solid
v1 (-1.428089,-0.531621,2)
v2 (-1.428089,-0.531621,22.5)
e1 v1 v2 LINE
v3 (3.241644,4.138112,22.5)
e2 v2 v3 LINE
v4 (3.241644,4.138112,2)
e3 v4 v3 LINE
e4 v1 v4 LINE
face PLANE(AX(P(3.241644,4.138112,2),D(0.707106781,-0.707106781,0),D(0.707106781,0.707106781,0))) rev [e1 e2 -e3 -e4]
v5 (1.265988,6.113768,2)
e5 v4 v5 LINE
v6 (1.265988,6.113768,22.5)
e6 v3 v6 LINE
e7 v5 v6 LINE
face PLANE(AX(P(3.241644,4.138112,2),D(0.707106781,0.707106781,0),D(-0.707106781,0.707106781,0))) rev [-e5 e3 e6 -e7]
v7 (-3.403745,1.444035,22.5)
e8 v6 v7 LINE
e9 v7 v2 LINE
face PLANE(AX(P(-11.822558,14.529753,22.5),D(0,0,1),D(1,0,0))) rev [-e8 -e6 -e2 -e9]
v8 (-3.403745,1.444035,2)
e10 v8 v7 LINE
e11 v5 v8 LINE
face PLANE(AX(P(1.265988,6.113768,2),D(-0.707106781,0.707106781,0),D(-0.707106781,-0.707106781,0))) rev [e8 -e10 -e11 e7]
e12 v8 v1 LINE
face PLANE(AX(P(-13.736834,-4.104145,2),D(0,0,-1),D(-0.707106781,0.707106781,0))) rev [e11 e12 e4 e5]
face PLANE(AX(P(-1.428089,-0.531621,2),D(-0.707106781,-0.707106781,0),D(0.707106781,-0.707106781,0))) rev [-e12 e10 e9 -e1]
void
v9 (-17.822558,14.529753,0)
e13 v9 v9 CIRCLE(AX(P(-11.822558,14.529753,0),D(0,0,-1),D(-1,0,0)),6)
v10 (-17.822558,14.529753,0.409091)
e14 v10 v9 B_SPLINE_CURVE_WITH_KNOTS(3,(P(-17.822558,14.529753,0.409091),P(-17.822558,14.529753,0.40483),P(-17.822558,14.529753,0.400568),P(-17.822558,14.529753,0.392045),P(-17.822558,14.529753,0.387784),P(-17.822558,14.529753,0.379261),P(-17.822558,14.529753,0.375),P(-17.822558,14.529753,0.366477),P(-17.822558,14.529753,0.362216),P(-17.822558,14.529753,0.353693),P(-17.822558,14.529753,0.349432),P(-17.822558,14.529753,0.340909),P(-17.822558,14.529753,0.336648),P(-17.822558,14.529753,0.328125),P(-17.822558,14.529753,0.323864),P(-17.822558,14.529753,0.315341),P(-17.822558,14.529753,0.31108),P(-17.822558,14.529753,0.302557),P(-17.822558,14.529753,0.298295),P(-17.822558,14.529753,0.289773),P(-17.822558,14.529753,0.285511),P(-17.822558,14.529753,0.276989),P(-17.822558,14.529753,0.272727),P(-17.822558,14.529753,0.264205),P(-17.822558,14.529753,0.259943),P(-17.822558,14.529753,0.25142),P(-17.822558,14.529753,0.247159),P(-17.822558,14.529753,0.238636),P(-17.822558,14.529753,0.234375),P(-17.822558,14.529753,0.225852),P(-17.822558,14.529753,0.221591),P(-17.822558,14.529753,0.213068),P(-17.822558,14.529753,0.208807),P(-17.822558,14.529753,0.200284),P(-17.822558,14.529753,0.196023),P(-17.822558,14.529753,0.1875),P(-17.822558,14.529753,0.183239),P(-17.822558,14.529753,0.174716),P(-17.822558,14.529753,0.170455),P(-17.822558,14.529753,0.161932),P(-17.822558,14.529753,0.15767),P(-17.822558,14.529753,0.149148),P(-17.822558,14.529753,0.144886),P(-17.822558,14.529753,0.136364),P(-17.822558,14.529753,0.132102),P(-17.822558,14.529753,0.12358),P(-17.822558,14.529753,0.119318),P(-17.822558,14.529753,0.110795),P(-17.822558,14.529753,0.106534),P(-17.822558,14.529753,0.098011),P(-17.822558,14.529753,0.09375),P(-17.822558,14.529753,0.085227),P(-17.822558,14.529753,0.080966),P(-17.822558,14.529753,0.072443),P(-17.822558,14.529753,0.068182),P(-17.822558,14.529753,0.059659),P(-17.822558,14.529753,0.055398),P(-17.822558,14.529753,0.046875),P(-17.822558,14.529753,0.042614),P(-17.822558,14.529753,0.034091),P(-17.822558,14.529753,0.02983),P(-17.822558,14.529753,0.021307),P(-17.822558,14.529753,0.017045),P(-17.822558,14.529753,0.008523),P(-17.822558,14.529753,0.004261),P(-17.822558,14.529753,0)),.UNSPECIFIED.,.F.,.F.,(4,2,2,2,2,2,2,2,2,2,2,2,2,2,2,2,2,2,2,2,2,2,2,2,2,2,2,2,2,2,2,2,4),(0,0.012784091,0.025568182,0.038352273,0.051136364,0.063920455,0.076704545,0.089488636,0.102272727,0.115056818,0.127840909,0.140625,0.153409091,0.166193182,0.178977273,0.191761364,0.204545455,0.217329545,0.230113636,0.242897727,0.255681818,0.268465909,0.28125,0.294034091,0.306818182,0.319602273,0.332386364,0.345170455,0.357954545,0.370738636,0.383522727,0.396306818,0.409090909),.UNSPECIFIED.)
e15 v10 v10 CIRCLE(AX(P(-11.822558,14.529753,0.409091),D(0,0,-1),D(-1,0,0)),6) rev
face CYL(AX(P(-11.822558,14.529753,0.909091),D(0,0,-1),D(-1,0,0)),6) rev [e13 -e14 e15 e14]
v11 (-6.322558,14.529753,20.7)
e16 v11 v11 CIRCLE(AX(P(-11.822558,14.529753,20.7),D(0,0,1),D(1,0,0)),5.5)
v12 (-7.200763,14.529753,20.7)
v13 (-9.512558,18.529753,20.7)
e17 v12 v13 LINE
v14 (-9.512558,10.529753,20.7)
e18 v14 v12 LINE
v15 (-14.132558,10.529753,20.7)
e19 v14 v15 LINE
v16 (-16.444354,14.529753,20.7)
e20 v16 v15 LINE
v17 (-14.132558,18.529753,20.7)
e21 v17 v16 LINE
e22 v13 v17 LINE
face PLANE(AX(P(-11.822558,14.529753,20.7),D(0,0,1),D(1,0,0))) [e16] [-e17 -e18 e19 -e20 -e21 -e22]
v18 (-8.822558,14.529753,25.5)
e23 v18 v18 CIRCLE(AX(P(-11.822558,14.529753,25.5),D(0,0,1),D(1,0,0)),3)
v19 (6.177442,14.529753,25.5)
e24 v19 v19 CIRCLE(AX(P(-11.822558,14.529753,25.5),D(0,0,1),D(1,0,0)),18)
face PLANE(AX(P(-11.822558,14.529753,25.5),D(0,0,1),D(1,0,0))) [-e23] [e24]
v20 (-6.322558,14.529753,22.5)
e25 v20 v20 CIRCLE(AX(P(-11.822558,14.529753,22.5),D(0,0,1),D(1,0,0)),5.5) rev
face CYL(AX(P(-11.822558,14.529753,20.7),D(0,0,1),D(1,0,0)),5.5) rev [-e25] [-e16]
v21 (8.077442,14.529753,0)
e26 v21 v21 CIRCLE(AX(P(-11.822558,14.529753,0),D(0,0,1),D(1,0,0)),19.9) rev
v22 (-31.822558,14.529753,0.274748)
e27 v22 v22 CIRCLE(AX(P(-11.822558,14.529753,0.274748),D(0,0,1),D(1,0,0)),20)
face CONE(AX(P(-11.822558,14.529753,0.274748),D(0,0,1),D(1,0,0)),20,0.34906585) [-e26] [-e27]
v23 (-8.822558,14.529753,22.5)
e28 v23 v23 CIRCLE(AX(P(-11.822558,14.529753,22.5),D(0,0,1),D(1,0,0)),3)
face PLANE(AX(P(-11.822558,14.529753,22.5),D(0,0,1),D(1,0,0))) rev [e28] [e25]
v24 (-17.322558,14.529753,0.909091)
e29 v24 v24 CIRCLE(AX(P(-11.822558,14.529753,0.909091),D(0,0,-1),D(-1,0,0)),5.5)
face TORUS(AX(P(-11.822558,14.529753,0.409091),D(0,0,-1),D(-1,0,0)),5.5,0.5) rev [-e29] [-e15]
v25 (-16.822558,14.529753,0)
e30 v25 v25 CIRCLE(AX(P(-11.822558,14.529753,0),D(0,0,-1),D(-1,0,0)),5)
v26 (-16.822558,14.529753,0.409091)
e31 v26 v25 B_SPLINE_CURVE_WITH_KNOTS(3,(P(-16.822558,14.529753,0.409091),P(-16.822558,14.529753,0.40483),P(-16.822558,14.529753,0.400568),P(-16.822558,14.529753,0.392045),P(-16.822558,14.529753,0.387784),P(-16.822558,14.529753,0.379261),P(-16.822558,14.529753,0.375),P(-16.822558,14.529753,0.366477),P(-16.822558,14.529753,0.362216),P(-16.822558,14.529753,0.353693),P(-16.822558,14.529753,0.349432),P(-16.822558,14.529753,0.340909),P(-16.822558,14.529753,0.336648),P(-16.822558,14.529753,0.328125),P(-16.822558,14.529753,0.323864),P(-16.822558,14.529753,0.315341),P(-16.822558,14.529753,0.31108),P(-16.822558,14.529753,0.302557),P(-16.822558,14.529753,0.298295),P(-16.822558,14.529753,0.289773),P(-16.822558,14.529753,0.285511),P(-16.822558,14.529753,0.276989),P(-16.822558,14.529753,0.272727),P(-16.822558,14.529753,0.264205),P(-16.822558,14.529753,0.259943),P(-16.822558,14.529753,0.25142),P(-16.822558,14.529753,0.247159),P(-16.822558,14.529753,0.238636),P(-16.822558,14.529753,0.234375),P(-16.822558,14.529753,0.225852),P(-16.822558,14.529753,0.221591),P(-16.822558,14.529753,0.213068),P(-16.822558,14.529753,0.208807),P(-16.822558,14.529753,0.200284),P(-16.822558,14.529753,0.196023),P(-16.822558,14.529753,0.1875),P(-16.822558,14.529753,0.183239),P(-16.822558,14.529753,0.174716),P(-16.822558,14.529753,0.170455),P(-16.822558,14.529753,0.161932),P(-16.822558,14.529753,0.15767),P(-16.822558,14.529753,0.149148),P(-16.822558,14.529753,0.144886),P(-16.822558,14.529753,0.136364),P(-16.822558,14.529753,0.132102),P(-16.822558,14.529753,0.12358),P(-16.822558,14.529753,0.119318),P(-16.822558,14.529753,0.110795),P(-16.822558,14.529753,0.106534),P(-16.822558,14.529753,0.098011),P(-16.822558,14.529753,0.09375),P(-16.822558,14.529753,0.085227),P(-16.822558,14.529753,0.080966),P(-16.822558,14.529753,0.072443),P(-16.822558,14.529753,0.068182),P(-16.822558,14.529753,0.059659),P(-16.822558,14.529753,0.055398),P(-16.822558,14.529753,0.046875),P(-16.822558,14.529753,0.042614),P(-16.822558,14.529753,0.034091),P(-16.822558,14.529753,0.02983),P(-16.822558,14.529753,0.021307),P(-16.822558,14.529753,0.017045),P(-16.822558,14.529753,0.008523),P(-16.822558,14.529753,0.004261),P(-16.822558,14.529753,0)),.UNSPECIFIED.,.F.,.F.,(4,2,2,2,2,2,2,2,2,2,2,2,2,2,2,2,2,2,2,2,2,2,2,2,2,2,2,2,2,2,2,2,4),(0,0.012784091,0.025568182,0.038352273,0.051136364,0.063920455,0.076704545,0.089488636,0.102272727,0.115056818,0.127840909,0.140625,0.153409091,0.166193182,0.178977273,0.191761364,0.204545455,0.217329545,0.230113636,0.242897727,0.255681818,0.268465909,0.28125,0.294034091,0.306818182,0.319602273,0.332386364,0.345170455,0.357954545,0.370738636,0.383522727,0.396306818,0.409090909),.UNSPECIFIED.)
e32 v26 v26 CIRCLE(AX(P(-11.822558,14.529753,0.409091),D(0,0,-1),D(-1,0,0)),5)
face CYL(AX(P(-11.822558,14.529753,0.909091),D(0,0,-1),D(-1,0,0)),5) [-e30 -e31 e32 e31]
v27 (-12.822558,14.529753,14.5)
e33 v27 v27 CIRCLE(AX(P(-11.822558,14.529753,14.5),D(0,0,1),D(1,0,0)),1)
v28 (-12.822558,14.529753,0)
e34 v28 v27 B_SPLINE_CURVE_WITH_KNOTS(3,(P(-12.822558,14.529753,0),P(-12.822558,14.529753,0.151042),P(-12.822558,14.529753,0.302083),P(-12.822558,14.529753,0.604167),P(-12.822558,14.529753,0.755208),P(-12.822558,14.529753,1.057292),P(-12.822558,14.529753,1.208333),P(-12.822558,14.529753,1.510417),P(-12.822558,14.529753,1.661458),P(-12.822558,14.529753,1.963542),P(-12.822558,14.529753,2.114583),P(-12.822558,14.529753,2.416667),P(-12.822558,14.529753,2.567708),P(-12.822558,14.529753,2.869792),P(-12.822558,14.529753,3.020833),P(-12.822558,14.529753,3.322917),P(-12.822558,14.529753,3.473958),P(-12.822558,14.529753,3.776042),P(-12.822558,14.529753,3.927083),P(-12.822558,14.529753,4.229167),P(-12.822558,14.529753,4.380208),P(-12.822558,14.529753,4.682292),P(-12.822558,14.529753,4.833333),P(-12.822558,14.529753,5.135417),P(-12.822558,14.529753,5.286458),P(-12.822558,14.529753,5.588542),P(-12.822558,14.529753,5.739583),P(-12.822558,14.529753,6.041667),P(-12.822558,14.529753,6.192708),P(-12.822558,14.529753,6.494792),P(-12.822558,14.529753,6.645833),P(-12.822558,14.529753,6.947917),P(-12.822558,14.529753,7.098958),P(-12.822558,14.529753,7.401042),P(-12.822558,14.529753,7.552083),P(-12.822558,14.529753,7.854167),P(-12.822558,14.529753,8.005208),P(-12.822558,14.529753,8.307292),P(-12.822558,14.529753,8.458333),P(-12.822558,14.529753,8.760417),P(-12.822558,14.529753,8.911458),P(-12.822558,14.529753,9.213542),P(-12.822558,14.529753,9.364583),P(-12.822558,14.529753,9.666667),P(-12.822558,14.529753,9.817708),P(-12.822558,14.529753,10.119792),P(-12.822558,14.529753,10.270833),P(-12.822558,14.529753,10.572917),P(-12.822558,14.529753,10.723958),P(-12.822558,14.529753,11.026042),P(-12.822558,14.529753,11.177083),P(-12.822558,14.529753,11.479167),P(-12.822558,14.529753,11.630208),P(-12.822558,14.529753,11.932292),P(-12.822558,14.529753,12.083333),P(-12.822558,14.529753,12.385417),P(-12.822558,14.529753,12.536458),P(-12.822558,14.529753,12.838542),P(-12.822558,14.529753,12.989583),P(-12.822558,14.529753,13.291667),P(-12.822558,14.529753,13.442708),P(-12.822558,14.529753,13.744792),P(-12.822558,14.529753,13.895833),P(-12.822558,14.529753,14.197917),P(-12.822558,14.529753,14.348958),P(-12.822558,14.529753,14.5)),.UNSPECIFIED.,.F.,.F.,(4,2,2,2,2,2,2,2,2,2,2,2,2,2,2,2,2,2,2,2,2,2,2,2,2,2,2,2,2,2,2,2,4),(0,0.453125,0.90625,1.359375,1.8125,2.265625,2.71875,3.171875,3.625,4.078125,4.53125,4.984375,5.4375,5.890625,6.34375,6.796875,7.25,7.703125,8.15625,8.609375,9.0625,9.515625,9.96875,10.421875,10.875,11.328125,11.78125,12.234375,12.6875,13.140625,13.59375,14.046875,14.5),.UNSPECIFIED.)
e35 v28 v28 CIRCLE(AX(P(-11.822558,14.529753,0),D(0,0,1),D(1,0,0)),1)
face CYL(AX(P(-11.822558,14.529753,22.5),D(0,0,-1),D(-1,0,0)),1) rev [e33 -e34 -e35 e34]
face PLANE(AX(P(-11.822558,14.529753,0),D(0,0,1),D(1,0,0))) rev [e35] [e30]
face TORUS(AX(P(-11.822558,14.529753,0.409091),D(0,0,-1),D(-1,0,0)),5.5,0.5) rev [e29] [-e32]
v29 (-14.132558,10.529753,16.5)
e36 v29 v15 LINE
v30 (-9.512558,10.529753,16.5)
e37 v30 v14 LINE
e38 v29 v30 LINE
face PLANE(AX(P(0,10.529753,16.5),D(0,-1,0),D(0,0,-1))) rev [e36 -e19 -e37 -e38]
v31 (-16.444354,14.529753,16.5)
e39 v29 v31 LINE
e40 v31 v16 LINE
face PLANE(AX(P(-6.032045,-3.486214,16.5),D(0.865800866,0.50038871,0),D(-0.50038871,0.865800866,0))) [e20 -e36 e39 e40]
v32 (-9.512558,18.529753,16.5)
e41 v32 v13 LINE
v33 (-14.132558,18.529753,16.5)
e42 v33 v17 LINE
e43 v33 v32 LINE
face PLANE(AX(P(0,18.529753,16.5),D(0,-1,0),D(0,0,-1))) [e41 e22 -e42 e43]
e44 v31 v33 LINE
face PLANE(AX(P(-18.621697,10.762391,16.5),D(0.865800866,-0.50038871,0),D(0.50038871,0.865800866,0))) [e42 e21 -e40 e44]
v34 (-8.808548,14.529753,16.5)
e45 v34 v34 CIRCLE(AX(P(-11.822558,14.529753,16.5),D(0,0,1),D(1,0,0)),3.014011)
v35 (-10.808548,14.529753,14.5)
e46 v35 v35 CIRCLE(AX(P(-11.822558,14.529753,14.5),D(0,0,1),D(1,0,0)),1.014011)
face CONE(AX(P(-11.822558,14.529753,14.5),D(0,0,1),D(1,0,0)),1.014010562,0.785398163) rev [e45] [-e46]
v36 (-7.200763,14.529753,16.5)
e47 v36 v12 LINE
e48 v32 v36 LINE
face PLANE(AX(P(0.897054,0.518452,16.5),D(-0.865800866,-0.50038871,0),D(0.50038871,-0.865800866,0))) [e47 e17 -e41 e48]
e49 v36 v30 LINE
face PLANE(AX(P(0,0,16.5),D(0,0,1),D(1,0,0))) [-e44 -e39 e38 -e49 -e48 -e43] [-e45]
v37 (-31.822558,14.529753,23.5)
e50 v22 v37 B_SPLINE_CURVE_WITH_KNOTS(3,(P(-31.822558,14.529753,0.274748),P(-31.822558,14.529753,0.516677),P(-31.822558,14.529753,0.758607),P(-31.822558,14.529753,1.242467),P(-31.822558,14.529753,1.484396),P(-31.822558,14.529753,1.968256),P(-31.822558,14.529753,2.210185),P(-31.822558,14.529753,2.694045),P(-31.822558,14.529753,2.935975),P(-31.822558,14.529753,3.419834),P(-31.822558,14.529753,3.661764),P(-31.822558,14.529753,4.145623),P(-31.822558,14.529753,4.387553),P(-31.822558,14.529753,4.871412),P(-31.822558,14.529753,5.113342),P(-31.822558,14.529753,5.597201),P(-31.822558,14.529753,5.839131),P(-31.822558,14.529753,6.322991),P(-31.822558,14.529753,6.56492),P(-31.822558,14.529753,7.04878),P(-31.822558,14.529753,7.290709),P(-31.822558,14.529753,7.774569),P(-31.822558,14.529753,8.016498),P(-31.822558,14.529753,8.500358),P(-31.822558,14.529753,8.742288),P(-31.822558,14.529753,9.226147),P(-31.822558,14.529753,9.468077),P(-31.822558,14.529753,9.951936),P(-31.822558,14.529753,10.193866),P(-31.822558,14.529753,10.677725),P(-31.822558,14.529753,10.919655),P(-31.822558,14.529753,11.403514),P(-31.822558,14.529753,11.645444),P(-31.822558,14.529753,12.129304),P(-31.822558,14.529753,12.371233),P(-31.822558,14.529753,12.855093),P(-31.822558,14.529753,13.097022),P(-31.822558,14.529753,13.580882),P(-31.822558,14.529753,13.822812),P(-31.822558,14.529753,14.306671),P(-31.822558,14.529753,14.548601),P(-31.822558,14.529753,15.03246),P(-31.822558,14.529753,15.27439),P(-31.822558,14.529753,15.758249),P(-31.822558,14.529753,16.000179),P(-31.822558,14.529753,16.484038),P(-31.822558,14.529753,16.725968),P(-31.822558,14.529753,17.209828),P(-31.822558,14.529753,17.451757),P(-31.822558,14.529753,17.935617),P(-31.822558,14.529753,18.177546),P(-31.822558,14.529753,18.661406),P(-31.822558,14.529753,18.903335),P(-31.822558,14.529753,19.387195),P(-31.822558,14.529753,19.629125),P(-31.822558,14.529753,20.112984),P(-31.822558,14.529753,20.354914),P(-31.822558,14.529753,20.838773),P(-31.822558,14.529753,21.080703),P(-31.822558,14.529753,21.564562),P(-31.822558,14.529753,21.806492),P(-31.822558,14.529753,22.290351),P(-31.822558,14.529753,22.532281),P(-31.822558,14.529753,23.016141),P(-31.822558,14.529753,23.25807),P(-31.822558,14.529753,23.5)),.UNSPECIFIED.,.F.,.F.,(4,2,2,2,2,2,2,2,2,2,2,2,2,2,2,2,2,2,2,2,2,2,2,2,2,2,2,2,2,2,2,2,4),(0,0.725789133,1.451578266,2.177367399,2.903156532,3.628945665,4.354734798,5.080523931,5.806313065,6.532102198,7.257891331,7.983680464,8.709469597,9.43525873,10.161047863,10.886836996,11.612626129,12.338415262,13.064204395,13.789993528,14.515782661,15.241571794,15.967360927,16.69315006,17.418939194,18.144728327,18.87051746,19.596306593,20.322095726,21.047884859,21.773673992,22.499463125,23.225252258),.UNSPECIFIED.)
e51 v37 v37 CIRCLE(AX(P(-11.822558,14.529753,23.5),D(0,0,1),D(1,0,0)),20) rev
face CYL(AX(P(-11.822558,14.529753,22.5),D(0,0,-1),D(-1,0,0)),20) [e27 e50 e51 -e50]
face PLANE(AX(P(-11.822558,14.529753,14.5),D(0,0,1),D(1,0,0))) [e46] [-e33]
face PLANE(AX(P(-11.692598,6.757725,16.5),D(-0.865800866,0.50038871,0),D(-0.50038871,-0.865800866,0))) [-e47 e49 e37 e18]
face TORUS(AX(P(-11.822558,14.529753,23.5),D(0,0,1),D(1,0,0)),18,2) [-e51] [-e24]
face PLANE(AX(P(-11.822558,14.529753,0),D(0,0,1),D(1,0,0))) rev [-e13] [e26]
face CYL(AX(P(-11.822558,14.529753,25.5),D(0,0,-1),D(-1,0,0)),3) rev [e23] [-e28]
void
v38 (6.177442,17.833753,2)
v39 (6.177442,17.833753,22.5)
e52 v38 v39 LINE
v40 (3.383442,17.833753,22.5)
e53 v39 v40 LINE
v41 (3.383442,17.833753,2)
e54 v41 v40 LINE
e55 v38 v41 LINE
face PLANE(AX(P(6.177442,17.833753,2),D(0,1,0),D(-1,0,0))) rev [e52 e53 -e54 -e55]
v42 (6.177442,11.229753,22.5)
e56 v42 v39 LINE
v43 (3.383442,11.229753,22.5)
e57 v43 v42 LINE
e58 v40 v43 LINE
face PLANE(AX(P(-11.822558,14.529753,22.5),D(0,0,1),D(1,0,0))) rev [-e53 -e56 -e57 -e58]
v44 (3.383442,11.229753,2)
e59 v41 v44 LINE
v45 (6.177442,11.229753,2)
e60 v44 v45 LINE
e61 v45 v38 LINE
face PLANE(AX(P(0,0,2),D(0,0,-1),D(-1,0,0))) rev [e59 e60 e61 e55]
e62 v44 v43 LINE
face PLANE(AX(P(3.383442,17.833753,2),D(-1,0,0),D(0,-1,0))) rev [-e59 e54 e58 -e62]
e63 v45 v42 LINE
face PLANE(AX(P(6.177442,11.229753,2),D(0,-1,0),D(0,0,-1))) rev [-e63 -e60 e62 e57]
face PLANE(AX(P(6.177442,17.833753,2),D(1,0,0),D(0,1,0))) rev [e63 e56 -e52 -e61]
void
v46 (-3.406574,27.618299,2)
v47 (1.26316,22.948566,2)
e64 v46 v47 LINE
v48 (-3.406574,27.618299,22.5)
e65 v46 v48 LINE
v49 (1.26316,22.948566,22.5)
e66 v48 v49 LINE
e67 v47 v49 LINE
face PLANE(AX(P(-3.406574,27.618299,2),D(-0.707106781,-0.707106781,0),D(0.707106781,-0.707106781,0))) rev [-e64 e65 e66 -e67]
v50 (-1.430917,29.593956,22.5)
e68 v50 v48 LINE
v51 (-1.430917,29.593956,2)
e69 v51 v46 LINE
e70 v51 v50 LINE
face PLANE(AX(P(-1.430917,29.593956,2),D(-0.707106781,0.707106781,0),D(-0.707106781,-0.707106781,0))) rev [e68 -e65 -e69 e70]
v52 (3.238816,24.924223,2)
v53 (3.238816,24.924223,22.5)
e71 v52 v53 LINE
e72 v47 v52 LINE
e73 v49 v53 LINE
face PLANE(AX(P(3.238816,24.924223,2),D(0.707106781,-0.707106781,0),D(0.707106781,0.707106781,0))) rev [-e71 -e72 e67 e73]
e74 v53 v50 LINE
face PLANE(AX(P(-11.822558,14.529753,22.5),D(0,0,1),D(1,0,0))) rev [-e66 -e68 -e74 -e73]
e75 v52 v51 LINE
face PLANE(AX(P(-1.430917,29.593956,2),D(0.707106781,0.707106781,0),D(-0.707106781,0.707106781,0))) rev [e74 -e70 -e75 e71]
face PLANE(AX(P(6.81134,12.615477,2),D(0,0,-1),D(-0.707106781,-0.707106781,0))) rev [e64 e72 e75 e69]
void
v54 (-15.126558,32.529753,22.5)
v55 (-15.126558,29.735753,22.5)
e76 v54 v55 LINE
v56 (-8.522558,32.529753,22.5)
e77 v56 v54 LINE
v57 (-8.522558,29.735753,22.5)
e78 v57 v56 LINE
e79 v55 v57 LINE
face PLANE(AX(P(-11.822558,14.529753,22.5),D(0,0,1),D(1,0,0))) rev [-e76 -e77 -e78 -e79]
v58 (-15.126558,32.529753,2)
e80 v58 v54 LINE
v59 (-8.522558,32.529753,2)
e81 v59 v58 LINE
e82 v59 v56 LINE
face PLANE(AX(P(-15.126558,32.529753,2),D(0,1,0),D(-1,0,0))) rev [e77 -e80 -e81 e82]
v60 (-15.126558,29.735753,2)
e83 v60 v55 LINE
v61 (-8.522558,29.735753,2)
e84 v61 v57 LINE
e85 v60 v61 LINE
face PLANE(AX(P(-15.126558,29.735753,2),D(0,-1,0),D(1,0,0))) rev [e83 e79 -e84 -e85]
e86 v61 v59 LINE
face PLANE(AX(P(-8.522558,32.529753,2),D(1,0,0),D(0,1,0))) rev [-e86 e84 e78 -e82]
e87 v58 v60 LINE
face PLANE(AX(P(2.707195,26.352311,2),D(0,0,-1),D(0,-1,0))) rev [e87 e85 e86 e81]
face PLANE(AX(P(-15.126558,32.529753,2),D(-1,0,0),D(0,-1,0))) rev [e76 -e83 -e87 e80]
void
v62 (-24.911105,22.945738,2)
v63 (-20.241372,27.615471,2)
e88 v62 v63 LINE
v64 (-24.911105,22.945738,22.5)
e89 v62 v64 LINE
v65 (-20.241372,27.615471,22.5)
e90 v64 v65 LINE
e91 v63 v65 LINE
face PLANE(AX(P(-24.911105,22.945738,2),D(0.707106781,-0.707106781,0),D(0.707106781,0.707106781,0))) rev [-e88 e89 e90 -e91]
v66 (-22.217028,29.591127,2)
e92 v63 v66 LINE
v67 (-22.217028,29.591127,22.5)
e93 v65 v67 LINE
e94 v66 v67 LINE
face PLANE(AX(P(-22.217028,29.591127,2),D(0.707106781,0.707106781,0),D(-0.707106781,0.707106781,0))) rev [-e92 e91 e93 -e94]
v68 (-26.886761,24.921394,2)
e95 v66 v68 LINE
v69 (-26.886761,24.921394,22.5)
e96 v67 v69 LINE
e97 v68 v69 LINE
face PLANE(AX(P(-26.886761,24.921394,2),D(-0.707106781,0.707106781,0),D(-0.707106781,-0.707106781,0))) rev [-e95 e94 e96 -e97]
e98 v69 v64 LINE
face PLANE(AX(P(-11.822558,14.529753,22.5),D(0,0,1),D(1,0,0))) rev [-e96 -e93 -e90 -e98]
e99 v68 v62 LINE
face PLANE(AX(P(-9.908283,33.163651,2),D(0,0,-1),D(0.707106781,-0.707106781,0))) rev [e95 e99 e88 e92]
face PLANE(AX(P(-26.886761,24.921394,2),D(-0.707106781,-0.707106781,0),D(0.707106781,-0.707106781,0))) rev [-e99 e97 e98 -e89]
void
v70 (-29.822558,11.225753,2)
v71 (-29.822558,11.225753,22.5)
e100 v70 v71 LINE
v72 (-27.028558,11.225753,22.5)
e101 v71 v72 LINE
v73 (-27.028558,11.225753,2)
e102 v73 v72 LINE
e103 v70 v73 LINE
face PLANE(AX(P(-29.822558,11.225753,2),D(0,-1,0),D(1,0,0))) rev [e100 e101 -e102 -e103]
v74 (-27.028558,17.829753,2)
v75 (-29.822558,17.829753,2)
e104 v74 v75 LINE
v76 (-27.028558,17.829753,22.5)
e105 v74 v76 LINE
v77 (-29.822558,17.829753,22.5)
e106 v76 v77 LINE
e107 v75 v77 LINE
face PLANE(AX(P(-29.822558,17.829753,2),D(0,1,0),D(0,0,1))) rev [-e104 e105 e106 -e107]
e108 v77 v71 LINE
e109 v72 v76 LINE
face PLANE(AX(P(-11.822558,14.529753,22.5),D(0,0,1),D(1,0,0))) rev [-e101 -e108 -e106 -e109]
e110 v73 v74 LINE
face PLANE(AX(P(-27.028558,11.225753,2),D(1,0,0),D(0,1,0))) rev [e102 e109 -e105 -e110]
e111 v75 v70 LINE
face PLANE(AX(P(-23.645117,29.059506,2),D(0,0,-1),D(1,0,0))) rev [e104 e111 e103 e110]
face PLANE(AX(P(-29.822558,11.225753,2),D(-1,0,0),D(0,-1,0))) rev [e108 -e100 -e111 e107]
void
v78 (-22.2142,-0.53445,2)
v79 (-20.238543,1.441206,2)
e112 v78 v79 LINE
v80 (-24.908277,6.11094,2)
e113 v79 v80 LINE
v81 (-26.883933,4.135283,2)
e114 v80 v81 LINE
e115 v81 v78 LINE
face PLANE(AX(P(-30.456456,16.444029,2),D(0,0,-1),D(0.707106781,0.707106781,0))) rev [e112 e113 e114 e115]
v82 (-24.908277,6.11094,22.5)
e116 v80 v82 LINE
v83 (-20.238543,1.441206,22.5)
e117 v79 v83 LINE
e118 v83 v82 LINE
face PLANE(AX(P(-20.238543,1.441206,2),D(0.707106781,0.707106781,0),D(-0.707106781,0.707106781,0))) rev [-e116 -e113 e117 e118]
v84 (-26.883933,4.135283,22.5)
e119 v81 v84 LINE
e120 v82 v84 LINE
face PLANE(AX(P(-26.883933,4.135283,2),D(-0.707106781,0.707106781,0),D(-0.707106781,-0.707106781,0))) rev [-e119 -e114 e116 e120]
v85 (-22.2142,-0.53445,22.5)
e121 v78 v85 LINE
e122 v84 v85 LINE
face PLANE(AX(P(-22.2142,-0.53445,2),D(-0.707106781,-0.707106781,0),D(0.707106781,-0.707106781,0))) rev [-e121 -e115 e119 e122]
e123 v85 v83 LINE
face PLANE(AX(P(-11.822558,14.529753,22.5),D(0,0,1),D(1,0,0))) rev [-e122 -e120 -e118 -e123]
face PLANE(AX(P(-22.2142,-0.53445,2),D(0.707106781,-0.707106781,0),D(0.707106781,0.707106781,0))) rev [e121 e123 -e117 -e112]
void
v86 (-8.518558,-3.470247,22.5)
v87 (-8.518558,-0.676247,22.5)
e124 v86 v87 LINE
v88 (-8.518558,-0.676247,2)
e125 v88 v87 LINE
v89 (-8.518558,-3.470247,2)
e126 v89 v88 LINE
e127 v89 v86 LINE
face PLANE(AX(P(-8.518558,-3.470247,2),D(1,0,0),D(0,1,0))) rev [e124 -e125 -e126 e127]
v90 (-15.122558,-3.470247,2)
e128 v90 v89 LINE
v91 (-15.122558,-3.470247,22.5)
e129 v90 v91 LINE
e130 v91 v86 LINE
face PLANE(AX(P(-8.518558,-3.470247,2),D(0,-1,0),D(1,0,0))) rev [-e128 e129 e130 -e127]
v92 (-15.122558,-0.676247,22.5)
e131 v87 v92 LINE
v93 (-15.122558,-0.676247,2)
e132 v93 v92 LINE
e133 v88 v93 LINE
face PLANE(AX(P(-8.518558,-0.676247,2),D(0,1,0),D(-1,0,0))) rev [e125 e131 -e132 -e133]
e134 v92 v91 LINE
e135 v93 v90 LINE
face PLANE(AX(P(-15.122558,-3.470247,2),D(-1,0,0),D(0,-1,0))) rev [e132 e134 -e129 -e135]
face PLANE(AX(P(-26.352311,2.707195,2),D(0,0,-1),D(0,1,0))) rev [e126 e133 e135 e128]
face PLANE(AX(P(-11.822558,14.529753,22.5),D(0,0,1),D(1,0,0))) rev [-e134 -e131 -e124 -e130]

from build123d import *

# Parameters (mm, degrees)
SKETCH1_R                       = 20
SKETCH1_R_2                     = 1
BOSS_EXTRUDE1_DEPTH             = 22.5
TAP_DRILL_FOR_M5X0_8_TAP1_D     = 4.2
TAP_DRILL_FOR_M5X0_8_TAP1_DEPTH = 5
TAP_DRILL_FOR_M5X0_8_TAP1_TIP   = 1.2618073
SKETCH4_W                       = 2.794
SKETCH4_H                       = 6.604
CUT_EXTRUDE1_DEPTH              = 20.5
CIRPATTERN1_COUNT               = 8
CUT_EXTRUDE3_START              = -6
SKETCH6_W                       = 4.62
SKETCH6_H                       = 8
SKETCH6_R                       = 2.1
CUT_EXTRUDE3_DEPTH              = 6
SKETCH7_R                       = 5.5
CUT_EXTRUDE4_DEPTH              = 1.8
SKETCH9_R                       = 3.014010562
CUT_EXTRUDE5_DEPTH              = 2
CHAMFER1_SIZE                   = 2
SKETCH8_R                       = 20
SKETCH8_R_2                     = 3
BOSS_EXTRUDE2_DEPTH             = 3
SKETCH5_R                       = 6
SKETCH5_R_2                     = 5
CUT_EXTRUDE2_DEPTH              = 0.909090909
FILLET3_R                       = 0.5
FILLET4_R                       = 2
CHAMFER2_SIZE                   = 0.1
CHAMFER2_SIZE2                  = 0.274747742


with BuildPart() as part:
    # Sketch1 → Boss-Extrude1 (new body)
    with BuildSketch(Plane.XY):
        with Locations(Location((-11.822558412, 14.529752947, 0), (0, 0, 180))):
            Circle(SKETCH1_R)
        with Locations(Location((-11.822558412, 14.529752947, 0), (0, 0, 180))):
            Circle(SKETCH1_R_2, mode=Mode.SUBTRACT)
    extrude(amount=BOSS_EXTRUDE1_DEPTH)

    # Tap Drill for M5x0.8 Tap1
    with Locations(Plane.XY.offset(22.5)):
        with Locations((-11.822558412, 14.529752947)):
            Hole(TAP_DRILL_FOR_M5X0_8_TAP1_D / 2, depth=TAP_DRILL_FOR_M5X0_8_TAP1_DEPTH)
            with Locations((0, 0, -(TAP_DRILL_FOR_M5X0_8_TAP1_DEPTH + TAP_DRILL_FOR_M5X0_8_TAP1_TIP / 2))):  # 118° drill point
                Cone(0, TAP_DRILL_FOR_M5X0_8_TAP1_D / 2, TAP_DRILL_FOR_M5X0_8_TAP1_TIP, mode=Mode.SUBTRACT)

    # Sketch4 → Cut-Extrude1 (cut)
    with BuildSketch(Plane.XY.offset(22.5)):
        with Locations((4.780441588, 14.531752947)):
            Rectangle(SKETCH4_W, SKETCH4_H)
    cut_extrude1 = extrude(amount=-CUT_EXTRUDE1_DEPTH, mode=Mode.SUBTRACT)

    # CirPattern1: Cut-Extrude1 ×8 about axis
    cirpattern1_axis = Axis((-11.822558412, 14.529752947, 0), (0, 0, 1))
    for i in range(1, CIRPATTERN1_COUNT):
        add(cut_extrude1.rotate(cirpattern1_axis, i * 360 / CIRPATTERN1_COUNT), mode=Mode.SUBTRACT)

    # Sketch6 → Cut-Extrude3 (cut)
    # profile 1 of 4: a face of its own
    with BuildSketch(Plane.XY.offset(22.5).offset(CUT_EXTRUDE3_START)):
        Polygon((-16.444354251, 14.529752947), (-14.132558412, 18.529752947), (-14.132558412, 10.529752947), align=None)
    # profile 2 of 4: a face of its own
    with BuildSketch(Plane.XY.offset(22.5).offset(CUT_EXTRUDE3_START)):
        Polygon((-7.200762573, 14.529752947), (-9.512558412, 10.529752947), (-9.512558412, 18.529752947), align=None)
    # profile 3 of 4: a face of its own
    with BuildSketch(Plane.XY.offset(22.5).offset(CUT_EXTRUDE3_START)):
        with Locations((-11.822558412, 14.529752947)):
            Rectangle(SKETCH6_W, SKETCH6_H)
        with Locations((-11.822558412, 14.529752947)):
            Circle(SKETCH6_R, mode=Mode.SUBTRACT)
    # profile 4 of 4: a face of its own
    with BuildSketch(Plane.XY.offset(22.5).offset(CUT_EXTRUDE3_START)):
        with Locations((-11.822558412, 14.529752947)):
            Circle(SKETCH6_R)
    extrude(amount=CUT_EXTRUDE3_DEPTH, mode=Mode.SUBTRACT)

    # Sketch7 → Cut-Extrude4 (cut)
    with BuildSketch(Plane.XY.offset(22.5)):
        with Locations((-11.822558412, 14.529752947)):
            Circle(SKETCH7_R)
    extrude(amount=-CUT_EXTRUDE4_DEPTH, mode=Mode.SUBTRACT)

    # Sketch9 → Cut-Extrude5 (cut)
    with BuildSketch(Plane.XY.offset(16.5)):
        with Locations((-11.822558412, 14.529752947)):
            Circle(SKETCH9_R)
    extrude(amount=-CUT_EXTRUDE5_DEPTH, mode=Mode.SUBTRACT)

    # Chamfer1
    chamfer1_edges = [part.edges().sort_by_distance(p)[0] for p in [
        (-14.836568974, 14.529752947, 14.5),
    ]]
    chamfer(chamfer1_edges, length=CHAMFER1_SIZE - 0.0001)  # a hair under: the kernel refuses the full size

    # Sketch8 → Boss-Extrude2 (add)
    with BuildSketch(Plane.XY.offset(22.5)):
        with Locations(Location((-11.822558412, 14.529752947, 0), (0, 0, 180))):
            Circle(SKETCH8_R)
        with Locations((-11.822558412, 14.529752947)):
            Circle(SKETCH8_R_2, mode=Mode.SUBTRACT)
    extrude(amount=BOSS_EXTRUDE2_DEPTH)

    # Sketch5 → Cut-Extrude2 (cut)
    with BuildSketch(Plane(origin=(0, 0, 0), x_dir=(-1, 0, 0), z_dir=(0, 0, -1))):
        with Locations((11.822558412, 14.529752947)):
            Circle(SKETCH5_R)
        with Locations((11.822558412, 14.529752947)):
            Circle(SKETCH5_R_2, mode=Mode.SUBTRACT)
    extrude(amount=-CUT_EXTRUDE2_DEPTH, mode=Mode.SUBTRACT)

    # Fillet3
    fillet3_edges = [part.edges().sort_by_distance(p)[0] for p in [
        (-5.822558412, 14.529752947, 0.909090909),
        (-6.822558412, 14.529752947, 0.909090909),
    ]]
    fillet(fillet3_edges, radius=FILLET3_R - 0.0001)  # a hair under: the kernel refuses the full size

    # Fillet4
    fillet4_edges = [part.edges().sort_by_distance(p)[0] for p in [
        (8.177441588, 14.529752947, 25.5),
    ]]
    fillet(fillet4_edges, radius=FILLET4_R)

    # Chamfer2
    chamfer2_edges = [part.edges().sort_by_distance(p)[0] for p in [
        (8.177441588, 14.529752947, 0),
    ]]
    chamfer2_side = [part.faces().sort_by_distance(p)[0] for p in [
        (7.611756163, 14.529752947, 0),
    ]]
    chamfer(chamfer2_edges, length=CHAMFER2_SIZE, length2=CHAMFER2_SIZE2, reference=chamfer2_side[0])


solid = part.part
